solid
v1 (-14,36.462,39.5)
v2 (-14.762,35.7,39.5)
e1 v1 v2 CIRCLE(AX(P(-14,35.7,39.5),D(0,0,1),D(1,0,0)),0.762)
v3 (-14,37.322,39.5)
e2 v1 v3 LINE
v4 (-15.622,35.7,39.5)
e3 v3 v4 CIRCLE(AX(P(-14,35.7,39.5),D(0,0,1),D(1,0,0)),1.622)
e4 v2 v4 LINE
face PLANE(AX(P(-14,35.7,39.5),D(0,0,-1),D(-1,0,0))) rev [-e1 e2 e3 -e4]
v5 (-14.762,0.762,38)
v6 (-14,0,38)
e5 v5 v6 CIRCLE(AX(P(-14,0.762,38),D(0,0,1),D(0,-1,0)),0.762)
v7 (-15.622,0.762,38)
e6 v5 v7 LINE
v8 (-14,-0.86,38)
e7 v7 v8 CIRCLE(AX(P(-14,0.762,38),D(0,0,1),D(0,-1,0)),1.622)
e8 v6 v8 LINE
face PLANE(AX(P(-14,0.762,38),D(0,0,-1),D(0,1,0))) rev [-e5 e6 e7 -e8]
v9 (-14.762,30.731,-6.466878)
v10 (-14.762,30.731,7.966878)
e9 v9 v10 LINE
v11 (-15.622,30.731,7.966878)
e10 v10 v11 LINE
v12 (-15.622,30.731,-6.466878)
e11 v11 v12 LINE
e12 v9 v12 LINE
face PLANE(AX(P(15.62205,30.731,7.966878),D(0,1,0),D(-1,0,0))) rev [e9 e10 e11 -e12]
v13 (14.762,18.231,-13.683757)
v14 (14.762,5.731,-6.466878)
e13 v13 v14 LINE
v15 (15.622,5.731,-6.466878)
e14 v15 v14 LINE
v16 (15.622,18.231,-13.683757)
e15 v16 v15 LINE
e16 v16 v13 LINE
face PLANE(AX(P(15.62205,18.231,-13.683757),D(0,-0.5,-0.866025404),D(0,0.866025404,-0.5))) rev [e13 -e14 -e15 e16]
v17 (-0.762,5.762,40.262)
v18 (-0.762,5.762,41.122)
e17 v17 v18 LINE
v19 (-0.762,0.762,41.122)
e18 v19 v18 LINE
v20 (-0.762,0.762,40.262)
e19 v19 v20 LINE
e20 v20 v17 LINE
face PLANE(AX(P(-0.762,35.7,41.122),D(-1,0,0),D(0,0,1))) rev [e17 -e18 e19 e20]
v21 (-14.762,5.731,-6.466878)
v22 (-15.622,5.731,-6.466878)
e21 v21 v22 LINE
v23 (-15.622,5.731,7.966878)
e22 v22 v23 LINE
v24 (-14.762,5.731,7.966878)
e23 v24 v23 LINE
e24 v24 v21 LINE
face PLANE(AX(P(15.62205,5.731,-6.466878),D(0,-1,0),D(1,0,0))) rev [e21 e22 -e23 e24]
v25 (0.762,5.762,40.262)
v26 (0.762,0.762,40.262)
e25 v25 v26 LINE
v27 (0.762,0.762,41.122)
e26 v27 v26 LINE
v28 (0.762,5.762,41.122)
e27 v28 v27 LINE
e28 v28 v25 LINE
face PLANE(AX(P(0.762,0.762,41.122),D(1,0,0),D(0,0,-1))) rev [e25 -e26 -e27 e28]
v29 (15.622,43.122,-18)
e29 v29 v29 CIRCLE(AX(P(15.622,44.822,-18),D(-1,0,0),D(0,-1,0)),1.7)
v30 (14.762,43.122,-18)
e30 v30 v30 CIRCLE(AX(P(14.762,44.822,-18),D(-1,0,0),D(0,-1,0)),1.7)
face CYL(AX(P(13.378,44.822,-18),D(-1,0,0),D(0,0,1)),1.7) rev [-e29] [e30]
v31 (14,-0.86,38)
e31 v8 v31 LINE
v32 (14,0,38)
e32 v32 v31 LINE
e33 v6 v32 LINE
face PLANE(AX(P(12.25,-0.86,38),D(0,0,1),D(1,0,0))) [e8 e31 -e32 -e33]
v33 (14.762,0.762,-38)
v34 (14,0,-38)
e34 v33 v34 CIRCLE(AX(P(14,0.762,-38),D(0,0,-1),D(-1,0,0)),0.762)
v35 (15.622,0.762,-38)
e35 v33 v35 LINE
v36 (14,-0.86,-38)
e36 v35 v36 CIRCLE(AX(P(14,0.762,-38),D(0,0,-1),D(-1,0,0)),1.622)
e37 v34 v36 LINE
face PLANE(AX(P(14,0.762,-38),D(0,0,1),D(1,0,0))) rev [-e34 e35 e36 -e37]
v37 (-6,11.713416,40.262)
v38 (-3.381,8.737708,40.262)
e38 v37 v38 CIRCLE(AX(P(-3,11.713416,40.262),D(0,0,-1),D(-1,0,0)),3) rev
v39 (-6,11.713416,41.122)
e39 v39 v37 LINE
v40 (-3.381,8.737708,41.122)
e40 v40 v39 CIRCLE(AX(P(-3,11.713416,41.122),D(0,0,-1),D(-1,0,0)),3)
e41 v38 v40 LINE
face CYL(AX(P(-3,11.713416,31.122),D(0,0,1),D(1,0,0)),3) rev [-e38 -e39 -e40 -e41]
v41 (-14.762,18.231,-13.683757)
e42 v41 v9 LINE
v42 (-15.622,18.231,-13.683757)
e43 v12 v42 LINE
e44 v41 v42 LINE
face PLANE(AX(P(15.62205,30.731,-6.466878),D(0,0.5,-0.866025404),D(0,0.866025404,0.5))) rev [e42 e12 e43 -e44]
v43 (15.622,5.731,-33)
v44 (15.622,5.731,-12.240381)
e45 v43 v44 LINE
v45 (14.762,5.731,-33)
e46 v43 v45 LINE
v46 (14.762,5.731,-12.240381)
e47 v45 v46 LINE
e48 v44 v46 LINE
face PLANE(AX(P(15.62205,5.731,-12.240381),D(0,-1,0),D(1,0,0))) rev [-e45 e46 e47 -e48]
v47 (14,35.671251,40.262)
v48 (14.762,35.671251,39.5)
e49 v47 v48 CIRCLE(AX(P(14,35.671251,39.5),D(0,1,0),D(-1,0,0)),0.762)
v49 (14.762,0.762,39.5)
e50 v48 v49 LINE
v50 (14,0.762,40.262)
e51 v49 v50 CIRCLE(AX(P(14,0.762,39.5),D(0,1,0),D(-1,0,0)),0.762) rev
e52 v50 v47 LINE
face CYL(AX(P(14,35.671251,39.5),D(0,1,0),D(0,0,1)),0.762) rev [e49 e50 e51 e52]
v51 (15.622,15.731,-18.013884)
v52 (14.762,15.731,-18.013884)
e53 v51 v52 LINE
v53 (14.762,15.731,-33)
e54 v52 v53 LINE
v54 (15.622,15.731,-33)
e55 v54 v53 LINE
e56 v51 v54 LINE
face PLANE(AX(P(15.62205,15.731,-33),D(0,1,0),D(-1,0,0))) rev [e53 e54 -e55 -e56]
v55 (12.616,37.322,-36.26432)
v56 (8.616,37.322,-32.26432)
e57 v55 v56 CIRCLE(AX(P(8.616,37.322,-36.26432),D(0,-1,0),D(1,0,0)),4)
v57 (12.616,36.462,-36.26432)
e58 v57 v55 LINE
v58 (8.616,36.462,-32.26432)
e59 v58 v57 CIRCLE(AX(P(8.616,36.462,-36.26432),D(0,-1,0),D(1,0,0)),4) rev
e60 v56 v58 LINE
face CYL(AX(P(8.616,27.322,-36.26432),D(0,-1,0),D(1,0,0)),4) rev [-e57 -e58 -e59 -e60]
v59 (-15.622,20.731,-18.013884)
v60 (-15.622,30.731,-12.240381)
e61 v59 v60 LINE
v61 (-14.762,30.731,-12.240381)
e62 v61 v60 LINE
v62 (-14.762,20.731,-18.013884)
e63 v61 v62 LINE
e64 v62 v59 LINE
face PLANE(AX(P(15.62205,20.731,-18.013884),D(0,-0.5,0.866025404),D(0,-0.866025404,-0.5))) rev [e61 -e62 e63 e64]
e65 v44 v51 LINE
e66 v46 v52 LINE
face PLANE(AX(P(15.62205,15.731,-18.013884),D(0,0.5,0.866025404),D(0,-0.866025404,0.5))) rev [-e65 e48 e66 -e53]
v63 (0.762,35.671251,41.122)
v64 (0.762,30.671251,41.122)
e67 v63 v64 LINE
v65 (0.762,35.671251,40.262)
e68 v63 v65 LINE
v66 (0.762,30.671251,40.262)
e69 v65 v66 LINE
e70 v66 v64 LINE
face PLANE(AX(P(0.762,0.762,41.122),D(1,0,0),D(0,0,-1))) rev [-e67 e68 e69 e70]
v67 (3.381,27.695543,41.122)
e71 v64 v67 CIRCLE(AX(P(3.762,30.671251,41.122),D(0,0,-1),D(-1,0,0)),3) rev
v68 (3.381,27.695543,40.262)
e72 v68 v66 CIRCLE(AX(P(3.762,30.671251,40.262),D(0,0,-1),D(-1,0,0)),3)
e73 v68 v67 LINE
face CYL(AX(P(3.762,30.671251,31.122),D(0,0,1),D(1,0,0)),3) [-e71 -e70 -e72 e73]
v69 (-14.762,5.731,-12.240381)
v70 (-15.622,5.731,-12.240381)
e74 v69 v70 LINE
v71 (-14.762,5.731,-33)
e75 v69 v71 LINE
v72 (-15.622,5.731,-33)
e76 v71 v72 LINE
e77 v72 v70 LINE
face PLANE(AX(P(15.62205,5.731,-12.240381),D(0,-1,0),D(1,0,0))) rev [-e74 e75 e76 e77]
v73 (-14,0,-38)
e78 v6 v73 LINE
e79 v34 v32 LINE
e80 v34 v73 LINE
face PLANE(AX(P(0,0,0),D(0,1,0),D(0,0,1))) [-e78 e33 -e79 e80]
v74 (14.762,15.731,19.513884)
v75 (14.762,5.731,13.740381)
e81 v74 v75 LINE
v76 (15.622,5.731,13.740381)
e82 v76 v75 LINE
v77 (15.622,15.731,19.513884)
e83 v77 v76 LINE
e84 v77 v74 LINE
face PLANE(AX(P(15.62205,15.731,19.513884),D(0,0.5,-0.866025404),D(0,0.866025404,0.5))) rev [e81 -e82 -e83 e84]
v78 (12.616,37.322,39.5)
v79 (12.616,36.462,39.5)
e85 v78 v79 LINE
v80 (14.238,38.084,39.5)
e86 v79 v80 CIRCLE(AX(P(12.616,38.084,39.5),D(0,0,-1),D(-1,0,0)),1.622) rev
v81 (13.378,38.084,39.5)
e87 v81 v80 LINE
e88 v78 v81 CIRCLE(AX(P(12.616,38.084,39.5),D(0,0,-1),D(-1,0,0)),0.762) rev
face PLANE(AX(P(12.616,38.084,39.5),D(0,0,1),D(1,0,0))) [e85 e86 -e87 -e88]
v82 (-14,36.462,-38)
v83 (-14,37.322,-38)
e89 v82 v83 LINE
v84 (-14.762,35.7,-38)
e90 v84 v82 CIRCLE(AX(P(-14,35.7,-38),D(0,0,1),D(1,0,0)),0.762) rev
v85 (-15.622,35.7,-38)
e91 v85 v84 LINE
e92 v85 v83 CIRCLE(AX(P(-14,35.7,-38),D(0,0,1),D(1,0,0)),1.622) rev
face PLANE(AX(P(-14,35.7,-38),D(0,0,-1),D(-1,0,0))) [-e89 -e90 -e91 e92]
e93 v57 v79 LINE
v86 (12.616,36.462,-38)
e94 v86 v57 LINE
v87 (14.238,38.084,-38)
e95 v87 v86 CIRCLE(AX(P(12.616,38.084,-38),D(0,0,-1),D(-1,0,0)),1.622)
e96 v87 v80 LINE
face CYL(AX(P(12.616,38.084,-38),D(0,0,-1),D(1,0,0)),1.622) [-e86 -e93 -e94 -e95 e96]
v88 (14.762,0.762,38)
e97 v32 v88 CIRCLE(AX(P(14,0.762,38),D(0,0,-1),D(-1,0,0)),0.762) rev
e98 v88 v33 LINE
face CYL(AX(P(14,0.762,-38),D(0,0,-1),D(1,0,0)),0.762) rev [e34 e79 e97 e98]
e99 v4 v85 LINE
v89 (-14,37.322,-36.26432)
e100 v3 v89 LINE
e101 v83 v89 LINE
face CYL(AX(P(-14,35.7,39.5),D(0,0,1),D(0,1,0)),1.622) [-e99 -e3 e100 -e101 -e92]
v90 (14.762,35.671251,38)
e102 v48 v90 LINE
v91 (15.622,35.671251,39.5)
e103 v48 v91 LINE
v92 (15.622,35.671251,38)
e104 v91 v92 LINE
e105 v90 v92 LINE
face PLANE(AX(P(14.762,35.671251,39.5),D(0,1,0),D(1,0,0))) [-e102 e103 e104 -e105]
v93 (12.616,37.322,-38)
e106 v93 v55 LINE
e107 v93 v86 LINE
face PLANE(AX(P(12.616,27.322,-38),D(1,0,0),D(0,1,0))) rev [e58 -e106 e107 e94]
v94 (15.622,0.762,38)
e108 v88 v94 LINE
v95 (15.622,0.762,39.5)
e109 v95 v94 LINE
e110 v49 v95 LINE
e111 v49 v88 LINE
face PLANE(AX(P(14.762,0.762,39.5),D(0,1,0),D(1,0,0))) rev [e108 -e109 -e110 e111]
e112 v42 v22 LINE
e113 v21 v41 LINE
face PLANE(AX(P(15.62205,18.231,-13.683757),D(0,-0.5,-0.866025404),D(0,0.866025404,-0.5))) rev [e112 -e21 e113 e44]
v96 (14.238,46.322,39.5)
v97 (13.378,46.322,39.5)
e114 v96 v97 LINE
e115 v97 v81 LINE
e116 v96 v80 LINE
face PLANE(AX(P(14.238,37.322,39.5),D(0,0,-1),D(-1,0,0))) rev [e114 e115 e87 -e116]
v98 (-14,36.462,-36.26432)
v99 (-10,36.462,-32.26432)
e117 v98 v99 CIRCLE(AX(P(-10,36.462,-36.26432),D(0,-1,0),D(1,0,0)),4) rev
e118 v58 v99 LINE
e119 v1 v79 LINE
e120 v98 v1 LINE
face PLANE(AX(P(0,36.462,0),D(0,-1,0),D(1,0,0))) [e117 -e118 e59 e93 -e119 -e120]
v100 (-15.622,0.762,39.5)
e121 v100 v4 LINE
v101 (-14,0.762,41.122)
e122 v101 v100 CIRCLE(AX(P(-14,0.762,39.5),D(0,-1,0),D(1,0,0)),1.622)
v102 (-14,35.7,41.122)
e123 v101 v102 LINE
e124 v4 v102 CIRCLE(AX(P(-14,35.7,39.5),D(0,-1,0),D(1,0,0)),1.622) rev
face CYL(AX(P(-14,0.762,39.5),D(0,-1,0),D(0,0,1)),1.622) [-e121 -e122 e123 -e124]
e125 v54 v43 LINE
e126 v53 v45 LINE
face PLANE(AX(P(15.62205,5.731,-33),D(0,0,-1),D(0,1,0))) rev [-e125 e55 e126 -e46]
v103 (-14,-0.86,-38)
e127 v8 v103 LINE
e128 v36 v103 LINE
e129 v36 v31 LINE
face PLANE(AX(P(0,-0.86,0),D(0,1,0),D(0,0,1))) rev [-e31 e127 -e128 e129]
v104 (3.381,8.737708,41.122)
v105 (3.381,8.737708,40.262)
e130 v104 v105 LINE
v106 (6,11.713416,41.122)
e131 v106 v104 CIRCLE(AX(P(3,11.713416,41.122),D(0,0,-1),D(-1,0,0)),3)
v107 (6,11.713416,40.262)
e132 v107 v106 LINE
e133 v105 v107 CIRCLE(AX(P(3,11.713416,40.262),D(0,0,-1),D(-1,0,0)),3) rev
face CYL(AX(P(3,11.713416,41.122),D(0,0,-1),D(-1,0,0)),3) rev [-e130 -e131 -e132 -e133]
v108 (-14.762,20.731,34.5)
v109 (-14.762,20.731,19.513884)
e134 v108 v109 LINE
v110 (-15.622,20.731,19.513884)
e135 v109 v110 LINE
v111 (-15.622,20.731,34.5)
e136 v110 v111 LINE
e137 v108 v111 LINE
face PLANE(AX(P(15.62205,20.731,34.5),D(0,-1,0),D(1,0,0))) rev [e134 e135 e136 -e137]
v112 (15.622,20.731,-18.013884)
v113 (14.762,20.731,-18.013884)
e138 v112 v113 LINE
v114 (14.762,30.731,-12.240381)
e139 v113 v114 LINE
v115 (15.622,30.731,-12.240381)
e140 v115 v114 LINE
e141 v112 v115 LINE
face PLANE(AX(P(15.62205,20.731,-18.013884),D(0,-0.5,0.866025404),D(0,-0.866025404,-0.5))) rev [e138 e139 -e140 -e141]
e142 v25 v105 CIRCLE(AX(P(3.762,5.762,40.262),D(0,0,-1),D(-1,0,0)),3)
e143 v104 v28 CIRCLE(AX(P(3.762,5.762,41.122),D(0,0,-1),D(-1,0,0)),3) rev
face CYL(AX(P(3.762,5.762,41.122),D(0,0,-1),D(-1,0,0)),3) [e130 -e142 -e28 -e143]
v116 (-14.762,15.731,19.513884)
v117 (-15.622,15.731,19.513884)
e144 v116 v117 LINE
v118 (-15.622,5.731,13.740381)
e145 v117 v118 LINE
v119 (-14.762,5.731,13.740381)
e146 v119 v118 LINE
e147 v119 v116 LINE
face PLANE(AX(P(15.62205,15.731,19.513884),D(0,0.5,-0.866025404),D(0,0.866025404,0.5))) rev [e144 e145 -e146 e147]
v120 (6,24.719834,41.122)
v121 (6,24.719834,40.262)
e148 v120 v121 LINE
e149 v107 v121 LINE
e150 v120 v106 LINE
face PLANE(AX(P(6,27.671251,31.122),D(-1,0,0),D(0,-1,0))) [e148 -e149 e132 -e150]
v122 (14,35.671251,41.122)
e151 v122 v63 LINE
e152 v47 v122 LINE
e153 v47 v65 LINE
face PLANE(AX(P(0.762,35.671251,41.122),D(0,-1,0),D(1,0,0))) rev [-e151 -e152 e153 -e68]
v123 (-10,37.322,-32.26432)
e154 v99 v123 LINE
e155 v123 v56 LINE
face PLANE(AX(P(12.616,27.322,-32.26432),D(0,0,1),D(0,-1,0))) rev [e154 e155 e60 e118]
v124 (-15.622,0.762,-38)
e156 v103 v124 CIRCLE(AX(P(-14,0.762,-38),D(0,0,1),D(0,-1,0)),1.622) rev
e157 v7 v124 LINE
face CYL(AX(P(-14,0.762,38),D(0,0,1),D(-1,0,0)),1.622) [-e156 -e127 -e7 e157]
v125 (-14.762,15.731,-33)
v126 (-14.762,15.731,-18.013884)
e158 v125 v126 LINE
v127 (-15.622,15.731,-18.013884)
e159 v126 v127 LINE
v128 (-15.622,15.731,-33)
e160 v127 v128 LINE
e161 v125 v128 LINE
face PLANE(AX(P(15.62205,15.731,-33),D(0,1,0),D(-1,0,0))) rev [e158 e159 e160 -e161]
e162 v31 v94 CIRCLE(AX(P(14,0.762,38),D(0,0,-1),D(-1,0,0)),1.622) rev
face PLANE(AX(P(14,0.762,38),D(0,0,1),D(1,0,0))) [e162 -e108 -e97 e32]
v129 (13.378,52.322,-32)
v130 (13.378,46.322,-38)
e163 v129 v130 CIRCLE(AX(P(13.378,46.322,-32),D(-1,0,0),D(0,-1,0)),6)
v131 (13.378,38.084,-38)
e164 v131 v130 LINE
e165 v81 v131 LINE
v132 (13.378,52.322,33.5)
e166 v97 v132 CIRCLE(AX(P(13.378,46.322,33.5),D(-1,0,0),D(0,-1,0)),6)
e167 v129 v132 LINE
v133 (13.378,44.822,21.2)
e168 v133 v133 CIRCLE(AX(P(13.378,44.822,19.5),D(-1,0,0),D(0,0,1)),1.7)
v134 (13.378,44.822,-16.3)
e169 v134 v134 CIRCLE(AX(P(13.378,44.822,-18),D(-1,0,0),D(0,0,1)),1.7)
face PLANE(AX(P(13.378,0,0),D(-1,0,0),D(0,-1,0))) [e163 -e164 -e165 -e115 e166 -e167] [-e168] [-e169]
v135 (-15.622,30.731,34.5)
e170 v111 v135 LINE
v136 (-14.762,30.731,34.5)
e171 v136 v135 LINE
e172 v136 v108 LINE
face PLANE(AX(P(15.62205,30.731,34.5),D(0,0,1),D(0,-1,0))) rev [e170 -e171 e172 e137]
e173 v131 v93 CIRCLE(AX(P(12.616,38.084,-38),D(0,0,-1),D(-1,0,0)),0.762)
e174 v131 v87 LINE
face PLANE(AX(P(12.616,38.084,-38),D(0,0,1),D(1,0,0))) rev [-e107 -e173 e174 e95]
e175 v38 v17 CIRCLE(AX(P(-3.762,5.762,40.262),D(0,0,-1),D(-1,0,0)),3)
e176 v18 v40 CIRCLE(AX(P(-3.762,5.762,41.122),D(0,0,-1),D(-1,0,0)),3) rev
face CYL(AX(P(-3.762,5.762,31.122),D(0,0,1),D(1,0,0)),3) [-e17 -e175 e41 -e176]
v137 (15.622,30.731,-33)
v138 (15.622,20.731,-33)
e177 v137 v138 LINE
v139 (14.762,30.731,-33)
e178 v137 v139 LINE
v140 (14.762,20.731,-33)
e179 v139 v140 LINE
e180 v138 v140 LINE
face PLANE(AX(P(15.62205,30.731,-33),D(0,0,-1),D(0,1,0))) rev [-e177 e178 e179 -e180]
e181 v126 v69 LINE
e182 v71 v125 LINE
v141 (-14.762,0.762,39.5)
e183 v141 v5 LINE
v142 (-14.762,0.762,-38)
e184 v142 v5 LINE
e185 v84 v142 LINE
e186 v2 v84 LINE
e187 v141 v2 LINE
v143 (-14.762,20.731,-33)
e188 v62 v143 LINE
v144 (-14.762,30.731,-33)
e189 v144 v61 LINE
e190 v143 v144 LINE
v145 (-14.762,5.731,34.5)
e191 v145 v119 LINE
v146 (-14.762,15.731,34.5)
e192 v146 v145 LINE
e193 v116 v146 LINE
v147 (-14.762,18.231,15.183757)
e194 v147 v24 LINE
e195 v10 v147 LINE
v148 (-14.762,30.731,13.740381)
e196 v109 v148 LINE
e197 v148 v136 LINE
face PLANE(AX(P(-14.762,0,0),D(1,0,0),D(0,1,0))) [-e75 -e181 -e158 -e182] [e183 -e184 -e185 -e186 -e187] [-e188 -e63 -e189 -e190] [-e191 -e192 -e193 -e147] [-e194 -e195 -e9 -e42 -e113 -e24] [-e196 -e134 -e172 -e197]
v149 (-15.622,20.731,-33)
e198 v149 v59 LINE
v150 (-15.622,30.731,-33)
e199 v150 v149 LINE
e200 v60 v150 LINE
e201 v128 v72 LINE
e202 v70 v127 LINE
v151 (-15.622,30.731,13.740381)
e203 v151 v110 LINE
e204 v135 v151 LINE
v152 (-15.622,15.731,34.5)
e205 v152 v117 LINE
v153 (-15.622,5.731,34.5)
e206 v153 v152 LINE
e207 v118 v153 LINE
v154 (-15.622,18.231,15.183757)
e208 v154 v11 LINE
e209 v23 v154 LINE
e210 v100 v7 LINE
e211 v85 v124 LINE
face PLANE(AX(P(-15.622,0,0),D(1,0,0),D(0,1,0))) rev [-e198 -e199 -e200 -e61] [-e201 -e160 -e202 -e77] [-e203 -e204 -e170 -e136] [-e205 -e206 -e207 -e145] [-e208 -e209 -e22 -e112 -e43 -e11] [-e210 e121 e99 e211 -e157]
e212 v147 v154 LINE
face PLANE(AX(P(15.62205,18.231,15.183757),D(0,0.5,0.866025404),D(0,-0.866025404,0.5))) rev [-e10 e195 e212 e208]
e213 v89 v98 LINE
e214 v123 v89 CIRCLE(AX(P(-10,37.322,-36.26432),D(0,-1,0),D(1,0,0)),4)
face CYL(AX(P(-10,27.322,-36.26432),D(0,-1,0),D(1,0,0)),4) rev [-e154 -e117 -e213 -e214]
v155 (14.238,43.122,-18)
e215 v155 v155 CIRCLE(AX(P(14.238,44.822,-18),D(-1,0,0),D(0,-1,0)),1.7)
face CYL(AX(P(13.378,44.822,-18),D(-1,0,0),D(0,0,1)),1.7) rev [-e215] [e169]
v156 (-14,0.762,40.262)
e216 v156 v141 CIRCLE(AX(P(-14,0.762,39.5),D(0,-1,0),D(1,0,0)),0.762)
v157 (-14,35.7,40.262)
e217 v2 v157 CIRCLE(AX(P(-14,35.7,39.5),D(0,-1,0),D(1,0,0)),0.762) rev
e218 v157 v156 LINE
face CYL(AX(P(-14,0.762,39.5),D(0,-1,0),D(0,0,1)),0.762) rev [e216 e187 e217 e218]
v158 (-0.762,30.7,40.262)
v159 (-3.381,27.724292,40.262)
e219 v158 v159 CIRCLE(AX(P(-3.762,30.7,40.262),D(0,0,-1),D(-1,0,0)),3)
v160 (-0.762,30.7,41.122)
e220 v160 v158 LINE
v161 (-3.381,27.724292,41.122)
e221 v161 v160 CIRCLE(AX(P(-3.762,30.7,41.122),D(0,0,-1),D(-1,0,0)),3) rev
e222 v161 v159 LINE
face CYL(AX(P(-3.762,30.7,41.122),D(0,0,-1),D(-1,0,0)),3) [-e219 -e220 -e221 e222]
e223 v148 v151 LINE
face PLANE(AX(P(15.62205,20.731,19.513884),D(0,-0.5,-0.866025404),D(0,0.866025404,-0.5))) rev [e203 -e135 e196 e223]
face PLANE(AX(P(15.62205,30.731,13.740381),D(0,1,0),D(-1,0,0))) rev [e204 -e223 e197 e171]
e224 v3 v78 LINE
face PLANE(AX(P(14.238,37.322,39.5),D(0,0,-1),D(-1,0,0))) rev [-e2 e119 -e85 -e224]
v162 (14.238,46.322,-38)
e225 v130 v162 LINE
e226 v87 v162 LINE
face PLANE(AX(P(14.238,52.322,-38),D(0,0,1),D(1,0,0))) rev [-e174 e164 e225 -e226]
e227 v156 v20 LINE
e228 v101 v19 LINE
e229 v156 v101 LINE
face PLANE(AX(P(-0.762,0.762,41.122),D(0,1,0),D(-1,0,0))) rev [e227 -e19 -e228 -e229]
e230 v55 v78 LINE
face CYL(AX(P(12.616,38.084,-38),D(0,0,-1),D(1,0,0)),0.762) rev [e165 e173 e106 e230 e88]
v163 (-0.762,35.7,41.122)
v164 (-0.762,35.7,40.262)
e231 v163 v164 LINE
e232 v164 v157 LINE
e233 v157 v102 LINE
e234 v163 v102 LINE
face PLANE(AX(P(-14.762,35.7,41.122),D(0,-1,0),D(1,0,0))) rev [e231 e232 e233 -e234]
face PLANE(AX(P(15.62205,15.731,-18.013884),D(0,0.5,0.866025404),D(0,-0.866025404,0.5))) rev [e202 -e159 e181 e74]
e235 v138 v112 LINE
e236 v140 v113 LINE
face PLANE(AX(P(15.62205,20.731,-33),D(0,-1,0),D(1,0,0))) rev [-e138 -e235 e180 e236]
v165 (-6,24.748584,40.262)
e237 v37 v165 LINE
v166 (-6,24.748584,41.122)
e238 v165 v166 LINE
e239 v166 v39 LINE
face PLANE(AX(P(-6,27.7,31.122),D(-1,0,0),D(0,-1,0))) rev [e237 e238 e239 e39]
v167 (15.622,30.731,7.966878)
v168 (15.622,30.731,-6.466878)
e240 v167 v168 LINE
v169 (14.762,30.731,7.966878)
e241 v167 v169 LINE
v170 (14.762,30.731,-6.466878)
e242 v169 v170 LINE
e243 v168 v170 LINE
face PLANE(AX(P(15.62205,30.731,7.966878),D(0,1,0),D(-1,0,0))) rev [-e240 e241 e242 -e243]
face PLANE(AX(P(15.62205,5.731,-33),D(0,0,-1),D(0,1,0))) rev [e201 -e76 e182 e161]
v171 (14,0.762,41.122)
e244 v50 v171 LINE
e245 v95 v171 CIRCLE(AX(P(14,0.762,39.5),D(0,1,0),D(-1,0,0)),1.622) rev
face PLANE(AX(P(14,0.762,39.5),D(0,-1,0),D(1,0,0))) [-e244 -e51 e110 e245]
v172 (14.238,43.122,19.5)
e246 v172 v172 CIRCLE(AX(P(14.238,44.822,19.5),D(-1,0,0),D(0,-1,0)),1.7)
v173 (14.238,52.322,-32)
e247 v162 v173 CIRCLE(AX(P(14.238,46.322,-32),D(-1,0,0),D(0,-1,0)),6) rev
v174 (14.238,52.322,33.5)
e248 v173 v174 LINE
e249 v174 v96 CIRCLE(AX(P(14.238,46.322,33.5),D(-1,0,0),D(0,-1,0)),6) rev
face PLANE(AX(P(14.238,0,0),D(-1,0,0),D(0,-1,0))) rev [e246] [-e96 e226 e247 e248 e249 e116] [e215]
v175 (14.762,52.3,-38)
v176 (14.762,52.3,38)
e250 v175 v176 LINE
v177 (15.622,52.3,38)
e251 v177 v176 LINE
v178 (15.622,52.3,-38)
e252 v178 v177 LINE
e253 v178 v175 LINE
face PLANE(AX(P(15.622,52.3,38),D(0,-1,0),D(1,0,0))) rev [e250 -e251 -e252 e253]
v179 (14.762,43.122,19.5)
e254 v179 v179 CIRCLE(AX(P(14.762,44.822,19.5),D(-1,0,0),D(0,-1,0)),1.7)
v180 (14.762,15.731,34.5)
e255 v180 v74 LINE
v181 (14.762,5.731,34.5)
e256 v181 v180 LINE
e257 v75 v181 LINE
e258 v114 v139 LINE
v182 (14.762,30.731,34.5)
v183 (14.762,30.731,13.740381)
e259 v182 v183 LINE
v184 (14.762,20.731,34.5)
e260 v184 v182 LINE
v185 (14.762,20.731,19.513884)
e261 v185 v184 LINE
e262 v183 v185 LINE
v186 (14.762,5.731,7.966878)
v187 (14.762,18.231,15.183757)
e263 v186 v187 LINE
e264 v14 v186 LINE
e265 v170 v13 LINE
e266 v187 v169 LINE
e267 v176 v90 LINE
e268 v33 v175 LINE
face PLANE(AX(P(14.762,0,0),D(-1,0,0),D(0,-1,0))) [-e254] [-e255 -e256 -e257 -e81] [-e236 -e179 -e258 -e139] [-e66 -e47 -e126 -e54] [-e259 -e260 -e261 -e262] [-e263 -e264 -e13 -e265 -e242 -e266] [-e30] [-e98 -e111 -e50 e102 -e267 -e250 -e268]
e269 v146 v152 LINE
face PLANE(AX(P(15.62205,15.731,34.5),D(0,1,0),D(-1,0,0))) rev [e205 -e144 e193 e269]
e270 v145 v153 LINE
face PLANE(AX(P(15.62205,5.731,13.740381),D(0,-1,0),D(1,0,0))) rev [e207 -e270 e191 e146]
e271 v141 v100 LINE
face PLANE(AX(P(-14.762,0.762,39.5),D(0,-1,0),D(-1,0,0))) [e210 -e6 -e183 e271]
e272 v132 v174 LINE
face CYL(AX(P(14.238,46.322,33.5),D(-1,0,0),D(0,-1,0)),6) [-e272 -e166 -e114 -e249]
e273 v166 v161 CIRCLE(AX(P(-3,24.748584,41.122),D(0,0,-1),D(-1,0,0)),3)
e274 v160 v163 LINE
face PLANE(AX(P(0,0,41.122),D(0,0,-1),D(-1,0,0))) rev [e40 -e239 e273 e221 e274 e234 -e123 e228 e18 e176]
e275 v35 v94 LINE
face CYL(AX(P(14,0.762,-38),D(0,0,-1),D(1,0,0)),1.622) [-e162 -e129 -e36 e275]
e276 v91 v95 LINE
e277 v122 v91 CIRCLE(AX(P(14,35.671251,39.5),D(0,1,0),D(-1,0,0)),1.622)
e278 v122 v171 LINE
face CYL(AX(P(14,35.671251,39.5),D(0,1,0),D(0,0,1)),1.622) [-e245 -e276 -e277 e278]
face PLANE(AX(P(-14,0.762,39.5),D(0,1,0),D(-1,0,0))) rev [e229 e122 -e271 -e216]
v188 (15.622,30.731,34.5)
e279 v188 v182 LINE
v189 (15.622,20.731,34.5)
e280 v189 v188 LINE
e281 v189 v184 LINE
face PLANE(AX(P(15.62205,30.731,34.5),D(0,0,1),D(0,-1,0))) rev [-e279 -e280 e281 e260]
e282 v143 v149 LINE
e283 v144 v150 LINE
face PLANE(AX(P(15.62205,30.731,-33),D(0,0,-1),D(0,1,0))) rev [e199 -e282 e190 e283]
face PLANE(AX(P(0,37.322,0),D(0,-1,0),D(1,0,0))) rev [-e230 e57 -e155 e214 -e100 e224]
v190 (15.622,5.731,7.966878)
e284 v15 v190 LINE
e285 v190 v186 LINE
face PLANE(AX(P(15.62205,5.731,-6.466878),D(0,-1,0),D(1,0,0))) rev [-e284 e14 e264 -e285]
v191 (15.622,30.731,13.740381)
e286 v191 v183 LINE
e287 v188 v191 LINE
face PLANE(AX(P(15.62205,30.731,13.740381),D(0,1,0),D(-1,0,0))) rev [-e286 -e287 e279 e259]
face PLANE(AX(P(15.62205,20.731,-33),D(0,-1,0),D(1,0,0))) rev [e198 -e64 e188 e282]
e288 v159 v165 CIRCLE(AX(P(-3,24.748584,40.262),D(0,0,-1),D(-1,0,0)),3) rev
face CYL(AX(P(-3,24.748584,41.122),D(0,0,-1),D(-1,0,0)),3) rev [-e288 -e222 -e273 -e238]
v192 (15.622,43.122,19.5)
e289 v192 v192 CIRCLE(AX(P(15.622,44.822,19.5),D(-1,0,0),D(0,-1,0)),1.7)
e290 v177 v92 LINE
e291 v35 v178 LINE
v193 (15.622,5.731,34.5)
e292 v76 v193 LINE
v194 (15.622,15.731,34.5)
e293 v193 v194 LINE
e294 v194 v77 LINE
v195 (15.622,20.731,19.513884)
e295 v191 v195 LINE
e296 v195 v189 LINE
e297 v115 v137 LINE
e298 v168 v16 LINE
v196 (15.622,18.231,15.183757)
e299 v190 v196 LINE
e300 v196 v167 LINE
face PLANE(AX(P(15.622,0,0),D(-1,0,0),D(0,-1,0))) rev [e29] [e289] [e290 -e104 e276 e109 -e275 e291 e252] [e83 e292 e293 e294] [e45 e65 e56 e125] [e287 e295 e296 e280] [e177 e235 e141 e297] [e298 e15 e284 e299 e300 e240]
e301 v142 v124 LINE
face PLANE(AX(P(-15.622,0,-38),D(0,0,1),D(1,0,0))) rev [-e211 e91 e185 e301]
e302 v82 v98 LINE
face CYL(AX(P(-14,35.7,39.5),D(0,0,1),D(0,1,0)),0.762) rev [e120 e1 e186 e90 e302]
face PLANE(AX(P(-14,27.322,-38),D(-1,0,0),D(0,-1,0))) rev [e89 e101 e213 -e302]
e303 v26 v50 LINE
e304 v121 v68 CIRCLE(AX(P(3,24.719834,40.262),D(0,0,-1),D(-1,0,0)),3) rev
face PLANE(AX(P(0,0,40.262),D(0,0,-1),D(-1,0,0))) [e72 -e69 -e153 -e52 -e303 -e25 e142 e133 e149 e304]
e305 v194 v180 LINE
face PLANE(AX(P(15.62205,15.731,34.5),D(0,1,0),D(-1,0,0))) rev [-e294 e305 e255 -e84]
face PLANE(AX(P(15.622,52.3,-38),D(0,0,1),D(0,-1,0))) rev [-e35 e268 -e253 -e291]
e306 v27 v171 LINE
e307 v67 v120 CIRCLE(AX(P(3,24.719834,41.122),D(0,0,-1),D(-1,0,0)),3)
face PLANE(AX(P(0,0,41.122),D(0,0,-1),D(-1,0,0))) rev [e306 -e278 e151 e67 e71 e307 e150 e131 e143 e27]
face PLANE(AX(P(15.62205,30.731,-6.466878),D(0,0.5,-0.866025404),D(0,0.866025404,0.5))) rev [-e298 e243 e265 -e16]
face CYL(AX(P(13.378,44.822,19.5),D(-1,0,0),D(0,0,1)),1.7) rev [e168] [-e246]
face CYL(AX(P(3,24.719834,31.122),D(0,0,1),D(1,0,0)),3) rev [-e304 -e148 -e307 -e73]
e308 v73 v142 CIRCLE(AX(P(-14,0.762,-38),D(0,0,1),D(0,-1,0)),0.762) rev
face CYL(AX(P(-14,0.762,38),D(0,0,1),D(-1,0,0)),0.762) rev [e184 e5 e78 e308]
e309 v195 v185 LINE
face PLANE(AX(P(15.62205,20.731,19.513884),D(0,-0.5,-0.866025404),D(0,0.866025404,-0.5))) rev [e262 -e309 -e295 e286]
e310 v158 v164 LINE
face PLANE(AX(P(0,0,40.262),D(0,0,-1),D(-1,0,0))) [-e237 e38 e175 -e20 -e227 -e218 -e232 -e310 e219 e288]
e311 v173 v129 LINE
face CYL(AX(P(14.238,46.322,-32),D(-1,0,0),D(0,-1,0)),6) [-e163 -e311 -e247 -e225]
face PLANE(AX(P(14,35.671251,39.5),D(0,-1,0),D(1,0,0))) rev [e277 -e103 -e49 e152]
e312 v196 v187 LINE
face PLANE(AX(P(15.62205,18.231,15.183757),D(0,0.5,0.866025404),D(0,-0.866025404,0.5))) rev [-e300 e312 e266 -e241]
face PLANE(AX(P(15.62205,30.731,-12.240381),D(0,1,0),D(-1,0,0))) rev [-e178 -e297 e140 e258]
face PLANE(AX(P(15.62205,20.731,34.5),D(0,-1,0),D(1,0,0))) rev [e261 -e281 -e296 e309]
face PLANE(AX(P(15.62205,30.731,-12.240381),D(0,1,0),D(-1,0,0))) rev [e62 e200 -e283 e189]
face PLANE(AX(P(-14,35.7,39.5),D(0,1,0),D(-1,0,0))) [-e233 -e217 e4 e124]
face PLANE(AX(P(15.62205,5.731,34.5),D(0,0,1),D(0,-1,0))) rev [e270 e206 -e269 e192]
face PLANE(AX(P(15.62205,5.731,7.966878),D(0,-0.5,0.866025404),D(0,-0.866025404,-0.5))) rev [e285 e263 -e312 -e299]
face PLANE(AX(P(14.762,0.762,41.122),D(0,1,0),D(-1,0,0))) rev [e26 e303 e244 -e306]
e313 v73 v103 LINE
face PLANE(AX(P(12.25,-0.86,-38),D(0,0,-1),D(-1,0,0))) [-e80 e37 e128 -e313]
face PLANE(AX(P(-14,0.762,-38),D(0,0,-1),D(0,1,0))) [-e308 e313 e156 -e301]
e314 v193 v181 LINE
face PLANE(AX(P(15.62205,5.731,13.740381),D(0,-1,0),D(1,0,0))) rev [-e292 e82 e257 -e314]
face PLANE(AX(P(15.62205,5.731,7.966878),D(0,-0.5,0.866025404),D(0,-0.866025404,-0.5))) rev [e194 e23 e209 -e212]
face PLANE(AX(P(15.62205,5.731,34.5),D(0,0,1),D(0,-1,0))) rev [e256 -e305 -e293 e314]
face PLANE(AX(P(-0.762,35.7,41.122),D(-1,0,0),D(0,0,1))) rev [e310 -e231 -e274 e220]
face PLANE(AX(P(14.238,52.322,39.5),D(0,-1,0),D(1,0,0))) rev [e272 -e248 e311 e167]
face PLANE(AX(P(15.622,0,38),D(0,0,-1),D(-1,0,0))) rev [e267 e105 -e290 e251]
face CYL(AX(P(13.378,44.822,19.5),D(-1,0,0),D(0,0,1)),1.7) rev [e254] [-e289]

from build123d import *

# Parameters (mm, degrees)
SKETCH1_W                = 24.5
SKETCH1_H                = 76
BASE_FLANGE1_DEPTH       = 0.86
EDGE_FLANGE1_DEPTH       = 76
EDGE_FLANGE4_DEPTH       = 76
EDGE_FLANGE5_DEPTH       = 34.909250773
EDGE_FLANGE6_DEPTH       = 34.938
EDGE_FLANGE7_DEPTH       = 77.5
SKETCH40_W               = 5.238
SKETCH40_H               = 18.938
CUT_EXTRUDE1_DEPTH       = 10
SKETCH41_W               = 5.238
SKETCH41_H               = 18.909250773
CUT_EXTRUDE2_DEPTH       = 10
FILLET1_R                = 3
FILLET2_R                = 3
EDGE_FLANGE9_START       = -38
EDGE_FLANGE9_DEPTH       = 77.5
EDGE_FLANGE9_2_DEPTH     = 77.5
M3_CLEARANCE_HOLE2_D     = 3.4
M3_CLEARANCE_HOLE2_DEPTH = 28.71
M3_CLEARANCE_HOLE2_TIP   = 1.021463052
FILLET4_R                = 6
SKETCH51_W               = 26.616
SKETCH51_H               = 5.735679753
CUT_EXTRUDE4_DEPTH       = 10
FILLET5_R                = 4
HEX_PATTERN_DEPTH        = 74.517332053


# Read off the part's stored shape, not the designer's step: Edge-Flange9
# Sheet-metal steps are written as plain solids
with BuildPart() as part:
    # Sketch1 → Base-Flange1 (new body)
    with BuildSketch(Plane(origin=(0, 0, 0), x_dir=(1, 0, 0), z_dir=(0, 1, 0))):
        Rectangle(SKETCH1_W, SKETCH1_H)
    extrude(amount=-BASE_FLANGE1_DEPTH)

    # Edge-Flange1 section (across the edge) → Edge-Flange1 (add)
    with BuildSketch(Plane(origin=(14.762, 0, 38), x_dir=(-1, 0, 0), z_dir=(0, 0, -1))):
        with BuildLine():
            Line((-0.86, 0.762), (-0.86, 52.3))
            Line((-0.86, 52.3), (0, 52.3))
            Line((0, 52.3), (0, 0.762))
            ThreePointArc((0, 0.762), (0.223184633, 0.223184633), (0.762, 0))
            Line((0.762, 0), (2.512, 0))
            Line((2.512, 0), (2.512, -0.86))
            Line((2.512, -0.86), (0.762, -0.86))
            ThreePointArc((0.762, -0.86), (-0.384927199, -0.384927199), (-0.86, 0.762))
        make_face()
    extrude(amount=EDGE_FLANGE1_DEPTH)

    # Edge-Flange4 section (across the edge) → Edge-Flange4 (add)
    with BuildSketch(Plane(origin=(-14.762, 0, -38), x_dir=(1, 0, 0), z_dir=(0, 0, 1))):
        with BuildLine():
            Line((-0.86, 0.762), (-0.86, 35.7))
            Line((-0.86, 35.7), (0, 35.7))
            Line((0, 35.7), (0, 0.762))
            ThreePointArc((0, 0.762), (0.223184633, 0.223184633), (0.762, 0))
            Line((0.762, 0), (2.512, 0))
            Line((2.512, 0), (2.512, -0.86))
            Line((2.512, -0.86), (0.762, -0.86))
            ThreePointArc((0.762, -0.86), (-0.384927199, -0.384927199), (-0.86, 0.762))
        make_face()
    extrude(amount=EDGE_FLANGE4_DEPTH)

    # Edge-Flange5 section (across the edge) → Edge-Flange5 (add)
    with BuildSketch(Plane(origin=(14.762, 0.762, 40.262), x_dir=(0, 0, -1), z_dir=(0, 1, 0))):
        with BuildLine():
            Line((-0.86, 0.762), (-0.86, 14))
            Line((-0.86, 14), (0, 14))
            Line((0, 14), (0, 0.762))
            ThreePointArc((0, 0.762), (0.223184633, 0.223184633), (0.762, 0))
            Line((0.762, 0), (2.262, 0))
            Line((2.262, 0), (2.262, -0.86))
            Line((2.262, -0.86), (0.762, -0.86))
            ThreePointArc((0.762, -0.86), (-0.384927199, -0.384927199), (-0.86, 0.762))
        make_face()
    extrude(amount=EDGE_FLANGE5_DEPTH)

    # Edge-Flange6 section (across the edge) → Edge-Flange6 (add)
    with BuildSketch(Plane(origin=(-14.762, 35.7, 40.262), x_dir=(0, 0, -1), z_dir=(0, -1, 0))):
        with BuildLine():
            Line((-0.86, 0.762), (-0.86, 14))
            Line((-0.86, 14), (0, 14))
            Line((0, 14), (0, 0.762))
            ThreePointArc((0, 0.762), (0.223184633, 0.223184633), (0.762, 0))
            Line((0.762, 0), (2.262, 0))
            Line((2.262, 0), (2.262, -0.86))
            Line((2.262, -0.86), (0.762, -0.86))
            ThreePointArc((0.762, -0.86), (-0.384927199, -0.384927199), (-0.86, 0.762))
        make_face()
    extrude(amount=EDGE_FLANGE6_DEPTH)

    # Edge-Flange7 section (across the edge) → Edge-Flange7 (add)
    with BuildSketch(Plane(origin=(-14.762, 36.462, -38), x_dir=(0, -1, 0), z_dir=(0, 0, 1))):
        with BuildLine():
            Line((-0.86, 0.762), (-0.86, 29))
            Line((-0.86, 29), (0, 29))
            Line((0, 29), (0, 0.762))
            ThreePointArc((0, 0.762), (0.223184633, 0.223184633), (0.762, 0))
            Line((0.762, 0), (0.762, -0.86))
            ThreePointArc((0.762, -0.86), (-0.384927199, -0.384927199), (-0.86, 0.762))
        make_face()
    extrude(amount=EDGE_FLANGE7_DEPTH)

    # Sketch40 → Cut-Extrude1 (cut)
    with BuildSketch(Plane.XY.offset(41.122)):
        with Locations((-3.381, 18.231)):
            Rectangle(SKETCH40_W, SKETCH40_H)
    extrude(amount=-CUT_EXTRUDE1_DEPTH, mode=Mode.SUBTRACT)

    # Sketch41 → Cut-Extrude2 (cut)
    with BuildSketch(Plane.XY.offset(41.122)):
        with Locations((3.381, 18.216625386)):
            Rectangle(SKETCH41_W, SKETCH41_H)
    extrude(amount=-CUT_EXTRUDE2_DEPTH, mode=Mode.SUBTRACT)

    # Fillet1
    fillet1_edges = [part.edges().sort_by_distance(p)[0] for p in [
        (-0.762, 8.762, 40.692),
        (-0.762, 27.7, 40.692),
        (0.762, 8.762, 40.692),
        (0.762, 27.671250773, 40.692),
    ]]
    fillet(fillet1_edges, radius=FILLET1_R)

    # Fillet2
    fillet2_edges = [part.edges().sort_by_distance(p)[0] for p in [
        (-6, 8.762, 40.692),
        (6, 8.762, 40.692),
        (6, 27.671250773, 40.692),
        (-6, 27.7, 40.692),
    ]]
    fillet(fillet2_edges, radius=FILLET2_R)

    # Edge-Flange9 outline → Edge-Flange9 (cut)
    with BuildSketch(Plane.XY.offset(EDGE_FLANGE9_START)):
        with BuildLine():
            Line((14.238, 37.322), (14.047865915, 37.322))
            ThreePointArc((14.047865915, 37.322), (13.451140707, 36.693523823), (12.616, 36.462))
            Line((12.616, 36.462), (14.238, 36.462))
            Line((14.238, 36.462), (14.238, 37.322))
        make_face()
    extrude(amount=EDGE_FLANGE9_DEPTH, mode=Mode.SUBTRACT)

    # Edge-Flange9 2 outline → Edge-Flange9 2 (add)
    with BuildSketch(Plane.XY.offset(EDGE_FLANGE9_START)):
        with BuildLine():
            ThreePointArc((14.047865915, 37.322), (14.189748791, 37.691318523), (14.238, 38.084))
            Line((14.238, 38.084), (14.238, 52.322))
            Line((14.238, 52.322), (13.378, 52.322))
            Line((13.378, 52.322), (13.378, 38.084))
            ThreePointArc((13.378, 38.084), (13.154815367, 37.545184633), (12.616, 37.322))
            Line((12.616, 37.322), (14.047865915, 37.322))
        make_face()
    extrude(amount=EDGE_FLANGE9_2_DEPTH)

    # M3 Clearance Hole2
    with Locations(Plane.ZY.offset(-13.378)):
        with Locations((-18, 44.822), (19.5, 44.822)):
            Hole(M3_CLEARANCE_HOLE2_D / 2, depth=M3_CLEARANCE_HOLE2_DEPTH)
            with Locations((0, 0, -(M3_CLEARANCE_HOLE2_DEPTH + M3_CLEARANCE_HOLE2_TIP / 2))):  # 118° drill point
                Cone(0, M3_CLEARANCE_HOLE2_D / 2, M3_CLEARANCE_HOLE2_TIP, mode=Mode.SUBTRACT)

    # Fillet4
    fillet4_edges = [part.edges().sort_by_distance(p)[0] for p in [
        (13.808, 52.322, 39.5),
        (13.808, 52.322, -38),
    ]]
    fillet(fillet4_edges, radius=FILLET4_R)

    # Sketch51 → Cut-Extrude4 (cut)
    with BuildSketch(Plane(origin=(0, 37.322, 0), x_dir=(1, 0, 0), z_dir=(0, 1, 0))):
        with Locations((-0.692, 35.132160124)):
            Rectangle(SKETCH51_W, SKETCH51_H)
    extrude(amount=-CUT_EXTRUDE4_DEPTH, mode=Mode.SUBTRACT)

    # Fillet5
    fillet5_edges = [part.edges().sort_by_distance(p)[0] for p in [
        (-14, 36.892, -32.264320247),
        (12.616, 36.892, -32.264320247),
    ]]
    fillet(fillet5_edges, radius=FILLET5_R)

    # Sketch52 → Hex Pattern (cut, through all)
    with BuildSketch(Plane.ZY.offset(15.622)):
        Polygon((13.740381057, 30.731), (34.5, 30.731), (34.5, 20.731), (19.513883749, 20.731), align=None)
        Polygon((15.18375673, 18.231), (7.966878365, 30.731), (-6.466878365, 30.731), (-13.68375673, 18.231), (-6.466878365, 5.731), (7.966878365, 5.731), align=None)
        Polygon((-18.013883749, 20.731), (-12.240381057, 30.731), (-33, 30.731), (-33, 20.731), align=None)
        Polygon((-18.013883749, 15.731), (-12.240381057, 5.731), (-33, 5.731), (-33, 15.731), align=None)
        Polygon((19.513883749, 15.731), (13.740381057, 5.731), (34.5, 5.731), (34.5, 15.731), align=None)
    extrude(amount=-HEX_PATTERN_DEPTH, mode=Mode.SUBTRACT)


solid = part.part
